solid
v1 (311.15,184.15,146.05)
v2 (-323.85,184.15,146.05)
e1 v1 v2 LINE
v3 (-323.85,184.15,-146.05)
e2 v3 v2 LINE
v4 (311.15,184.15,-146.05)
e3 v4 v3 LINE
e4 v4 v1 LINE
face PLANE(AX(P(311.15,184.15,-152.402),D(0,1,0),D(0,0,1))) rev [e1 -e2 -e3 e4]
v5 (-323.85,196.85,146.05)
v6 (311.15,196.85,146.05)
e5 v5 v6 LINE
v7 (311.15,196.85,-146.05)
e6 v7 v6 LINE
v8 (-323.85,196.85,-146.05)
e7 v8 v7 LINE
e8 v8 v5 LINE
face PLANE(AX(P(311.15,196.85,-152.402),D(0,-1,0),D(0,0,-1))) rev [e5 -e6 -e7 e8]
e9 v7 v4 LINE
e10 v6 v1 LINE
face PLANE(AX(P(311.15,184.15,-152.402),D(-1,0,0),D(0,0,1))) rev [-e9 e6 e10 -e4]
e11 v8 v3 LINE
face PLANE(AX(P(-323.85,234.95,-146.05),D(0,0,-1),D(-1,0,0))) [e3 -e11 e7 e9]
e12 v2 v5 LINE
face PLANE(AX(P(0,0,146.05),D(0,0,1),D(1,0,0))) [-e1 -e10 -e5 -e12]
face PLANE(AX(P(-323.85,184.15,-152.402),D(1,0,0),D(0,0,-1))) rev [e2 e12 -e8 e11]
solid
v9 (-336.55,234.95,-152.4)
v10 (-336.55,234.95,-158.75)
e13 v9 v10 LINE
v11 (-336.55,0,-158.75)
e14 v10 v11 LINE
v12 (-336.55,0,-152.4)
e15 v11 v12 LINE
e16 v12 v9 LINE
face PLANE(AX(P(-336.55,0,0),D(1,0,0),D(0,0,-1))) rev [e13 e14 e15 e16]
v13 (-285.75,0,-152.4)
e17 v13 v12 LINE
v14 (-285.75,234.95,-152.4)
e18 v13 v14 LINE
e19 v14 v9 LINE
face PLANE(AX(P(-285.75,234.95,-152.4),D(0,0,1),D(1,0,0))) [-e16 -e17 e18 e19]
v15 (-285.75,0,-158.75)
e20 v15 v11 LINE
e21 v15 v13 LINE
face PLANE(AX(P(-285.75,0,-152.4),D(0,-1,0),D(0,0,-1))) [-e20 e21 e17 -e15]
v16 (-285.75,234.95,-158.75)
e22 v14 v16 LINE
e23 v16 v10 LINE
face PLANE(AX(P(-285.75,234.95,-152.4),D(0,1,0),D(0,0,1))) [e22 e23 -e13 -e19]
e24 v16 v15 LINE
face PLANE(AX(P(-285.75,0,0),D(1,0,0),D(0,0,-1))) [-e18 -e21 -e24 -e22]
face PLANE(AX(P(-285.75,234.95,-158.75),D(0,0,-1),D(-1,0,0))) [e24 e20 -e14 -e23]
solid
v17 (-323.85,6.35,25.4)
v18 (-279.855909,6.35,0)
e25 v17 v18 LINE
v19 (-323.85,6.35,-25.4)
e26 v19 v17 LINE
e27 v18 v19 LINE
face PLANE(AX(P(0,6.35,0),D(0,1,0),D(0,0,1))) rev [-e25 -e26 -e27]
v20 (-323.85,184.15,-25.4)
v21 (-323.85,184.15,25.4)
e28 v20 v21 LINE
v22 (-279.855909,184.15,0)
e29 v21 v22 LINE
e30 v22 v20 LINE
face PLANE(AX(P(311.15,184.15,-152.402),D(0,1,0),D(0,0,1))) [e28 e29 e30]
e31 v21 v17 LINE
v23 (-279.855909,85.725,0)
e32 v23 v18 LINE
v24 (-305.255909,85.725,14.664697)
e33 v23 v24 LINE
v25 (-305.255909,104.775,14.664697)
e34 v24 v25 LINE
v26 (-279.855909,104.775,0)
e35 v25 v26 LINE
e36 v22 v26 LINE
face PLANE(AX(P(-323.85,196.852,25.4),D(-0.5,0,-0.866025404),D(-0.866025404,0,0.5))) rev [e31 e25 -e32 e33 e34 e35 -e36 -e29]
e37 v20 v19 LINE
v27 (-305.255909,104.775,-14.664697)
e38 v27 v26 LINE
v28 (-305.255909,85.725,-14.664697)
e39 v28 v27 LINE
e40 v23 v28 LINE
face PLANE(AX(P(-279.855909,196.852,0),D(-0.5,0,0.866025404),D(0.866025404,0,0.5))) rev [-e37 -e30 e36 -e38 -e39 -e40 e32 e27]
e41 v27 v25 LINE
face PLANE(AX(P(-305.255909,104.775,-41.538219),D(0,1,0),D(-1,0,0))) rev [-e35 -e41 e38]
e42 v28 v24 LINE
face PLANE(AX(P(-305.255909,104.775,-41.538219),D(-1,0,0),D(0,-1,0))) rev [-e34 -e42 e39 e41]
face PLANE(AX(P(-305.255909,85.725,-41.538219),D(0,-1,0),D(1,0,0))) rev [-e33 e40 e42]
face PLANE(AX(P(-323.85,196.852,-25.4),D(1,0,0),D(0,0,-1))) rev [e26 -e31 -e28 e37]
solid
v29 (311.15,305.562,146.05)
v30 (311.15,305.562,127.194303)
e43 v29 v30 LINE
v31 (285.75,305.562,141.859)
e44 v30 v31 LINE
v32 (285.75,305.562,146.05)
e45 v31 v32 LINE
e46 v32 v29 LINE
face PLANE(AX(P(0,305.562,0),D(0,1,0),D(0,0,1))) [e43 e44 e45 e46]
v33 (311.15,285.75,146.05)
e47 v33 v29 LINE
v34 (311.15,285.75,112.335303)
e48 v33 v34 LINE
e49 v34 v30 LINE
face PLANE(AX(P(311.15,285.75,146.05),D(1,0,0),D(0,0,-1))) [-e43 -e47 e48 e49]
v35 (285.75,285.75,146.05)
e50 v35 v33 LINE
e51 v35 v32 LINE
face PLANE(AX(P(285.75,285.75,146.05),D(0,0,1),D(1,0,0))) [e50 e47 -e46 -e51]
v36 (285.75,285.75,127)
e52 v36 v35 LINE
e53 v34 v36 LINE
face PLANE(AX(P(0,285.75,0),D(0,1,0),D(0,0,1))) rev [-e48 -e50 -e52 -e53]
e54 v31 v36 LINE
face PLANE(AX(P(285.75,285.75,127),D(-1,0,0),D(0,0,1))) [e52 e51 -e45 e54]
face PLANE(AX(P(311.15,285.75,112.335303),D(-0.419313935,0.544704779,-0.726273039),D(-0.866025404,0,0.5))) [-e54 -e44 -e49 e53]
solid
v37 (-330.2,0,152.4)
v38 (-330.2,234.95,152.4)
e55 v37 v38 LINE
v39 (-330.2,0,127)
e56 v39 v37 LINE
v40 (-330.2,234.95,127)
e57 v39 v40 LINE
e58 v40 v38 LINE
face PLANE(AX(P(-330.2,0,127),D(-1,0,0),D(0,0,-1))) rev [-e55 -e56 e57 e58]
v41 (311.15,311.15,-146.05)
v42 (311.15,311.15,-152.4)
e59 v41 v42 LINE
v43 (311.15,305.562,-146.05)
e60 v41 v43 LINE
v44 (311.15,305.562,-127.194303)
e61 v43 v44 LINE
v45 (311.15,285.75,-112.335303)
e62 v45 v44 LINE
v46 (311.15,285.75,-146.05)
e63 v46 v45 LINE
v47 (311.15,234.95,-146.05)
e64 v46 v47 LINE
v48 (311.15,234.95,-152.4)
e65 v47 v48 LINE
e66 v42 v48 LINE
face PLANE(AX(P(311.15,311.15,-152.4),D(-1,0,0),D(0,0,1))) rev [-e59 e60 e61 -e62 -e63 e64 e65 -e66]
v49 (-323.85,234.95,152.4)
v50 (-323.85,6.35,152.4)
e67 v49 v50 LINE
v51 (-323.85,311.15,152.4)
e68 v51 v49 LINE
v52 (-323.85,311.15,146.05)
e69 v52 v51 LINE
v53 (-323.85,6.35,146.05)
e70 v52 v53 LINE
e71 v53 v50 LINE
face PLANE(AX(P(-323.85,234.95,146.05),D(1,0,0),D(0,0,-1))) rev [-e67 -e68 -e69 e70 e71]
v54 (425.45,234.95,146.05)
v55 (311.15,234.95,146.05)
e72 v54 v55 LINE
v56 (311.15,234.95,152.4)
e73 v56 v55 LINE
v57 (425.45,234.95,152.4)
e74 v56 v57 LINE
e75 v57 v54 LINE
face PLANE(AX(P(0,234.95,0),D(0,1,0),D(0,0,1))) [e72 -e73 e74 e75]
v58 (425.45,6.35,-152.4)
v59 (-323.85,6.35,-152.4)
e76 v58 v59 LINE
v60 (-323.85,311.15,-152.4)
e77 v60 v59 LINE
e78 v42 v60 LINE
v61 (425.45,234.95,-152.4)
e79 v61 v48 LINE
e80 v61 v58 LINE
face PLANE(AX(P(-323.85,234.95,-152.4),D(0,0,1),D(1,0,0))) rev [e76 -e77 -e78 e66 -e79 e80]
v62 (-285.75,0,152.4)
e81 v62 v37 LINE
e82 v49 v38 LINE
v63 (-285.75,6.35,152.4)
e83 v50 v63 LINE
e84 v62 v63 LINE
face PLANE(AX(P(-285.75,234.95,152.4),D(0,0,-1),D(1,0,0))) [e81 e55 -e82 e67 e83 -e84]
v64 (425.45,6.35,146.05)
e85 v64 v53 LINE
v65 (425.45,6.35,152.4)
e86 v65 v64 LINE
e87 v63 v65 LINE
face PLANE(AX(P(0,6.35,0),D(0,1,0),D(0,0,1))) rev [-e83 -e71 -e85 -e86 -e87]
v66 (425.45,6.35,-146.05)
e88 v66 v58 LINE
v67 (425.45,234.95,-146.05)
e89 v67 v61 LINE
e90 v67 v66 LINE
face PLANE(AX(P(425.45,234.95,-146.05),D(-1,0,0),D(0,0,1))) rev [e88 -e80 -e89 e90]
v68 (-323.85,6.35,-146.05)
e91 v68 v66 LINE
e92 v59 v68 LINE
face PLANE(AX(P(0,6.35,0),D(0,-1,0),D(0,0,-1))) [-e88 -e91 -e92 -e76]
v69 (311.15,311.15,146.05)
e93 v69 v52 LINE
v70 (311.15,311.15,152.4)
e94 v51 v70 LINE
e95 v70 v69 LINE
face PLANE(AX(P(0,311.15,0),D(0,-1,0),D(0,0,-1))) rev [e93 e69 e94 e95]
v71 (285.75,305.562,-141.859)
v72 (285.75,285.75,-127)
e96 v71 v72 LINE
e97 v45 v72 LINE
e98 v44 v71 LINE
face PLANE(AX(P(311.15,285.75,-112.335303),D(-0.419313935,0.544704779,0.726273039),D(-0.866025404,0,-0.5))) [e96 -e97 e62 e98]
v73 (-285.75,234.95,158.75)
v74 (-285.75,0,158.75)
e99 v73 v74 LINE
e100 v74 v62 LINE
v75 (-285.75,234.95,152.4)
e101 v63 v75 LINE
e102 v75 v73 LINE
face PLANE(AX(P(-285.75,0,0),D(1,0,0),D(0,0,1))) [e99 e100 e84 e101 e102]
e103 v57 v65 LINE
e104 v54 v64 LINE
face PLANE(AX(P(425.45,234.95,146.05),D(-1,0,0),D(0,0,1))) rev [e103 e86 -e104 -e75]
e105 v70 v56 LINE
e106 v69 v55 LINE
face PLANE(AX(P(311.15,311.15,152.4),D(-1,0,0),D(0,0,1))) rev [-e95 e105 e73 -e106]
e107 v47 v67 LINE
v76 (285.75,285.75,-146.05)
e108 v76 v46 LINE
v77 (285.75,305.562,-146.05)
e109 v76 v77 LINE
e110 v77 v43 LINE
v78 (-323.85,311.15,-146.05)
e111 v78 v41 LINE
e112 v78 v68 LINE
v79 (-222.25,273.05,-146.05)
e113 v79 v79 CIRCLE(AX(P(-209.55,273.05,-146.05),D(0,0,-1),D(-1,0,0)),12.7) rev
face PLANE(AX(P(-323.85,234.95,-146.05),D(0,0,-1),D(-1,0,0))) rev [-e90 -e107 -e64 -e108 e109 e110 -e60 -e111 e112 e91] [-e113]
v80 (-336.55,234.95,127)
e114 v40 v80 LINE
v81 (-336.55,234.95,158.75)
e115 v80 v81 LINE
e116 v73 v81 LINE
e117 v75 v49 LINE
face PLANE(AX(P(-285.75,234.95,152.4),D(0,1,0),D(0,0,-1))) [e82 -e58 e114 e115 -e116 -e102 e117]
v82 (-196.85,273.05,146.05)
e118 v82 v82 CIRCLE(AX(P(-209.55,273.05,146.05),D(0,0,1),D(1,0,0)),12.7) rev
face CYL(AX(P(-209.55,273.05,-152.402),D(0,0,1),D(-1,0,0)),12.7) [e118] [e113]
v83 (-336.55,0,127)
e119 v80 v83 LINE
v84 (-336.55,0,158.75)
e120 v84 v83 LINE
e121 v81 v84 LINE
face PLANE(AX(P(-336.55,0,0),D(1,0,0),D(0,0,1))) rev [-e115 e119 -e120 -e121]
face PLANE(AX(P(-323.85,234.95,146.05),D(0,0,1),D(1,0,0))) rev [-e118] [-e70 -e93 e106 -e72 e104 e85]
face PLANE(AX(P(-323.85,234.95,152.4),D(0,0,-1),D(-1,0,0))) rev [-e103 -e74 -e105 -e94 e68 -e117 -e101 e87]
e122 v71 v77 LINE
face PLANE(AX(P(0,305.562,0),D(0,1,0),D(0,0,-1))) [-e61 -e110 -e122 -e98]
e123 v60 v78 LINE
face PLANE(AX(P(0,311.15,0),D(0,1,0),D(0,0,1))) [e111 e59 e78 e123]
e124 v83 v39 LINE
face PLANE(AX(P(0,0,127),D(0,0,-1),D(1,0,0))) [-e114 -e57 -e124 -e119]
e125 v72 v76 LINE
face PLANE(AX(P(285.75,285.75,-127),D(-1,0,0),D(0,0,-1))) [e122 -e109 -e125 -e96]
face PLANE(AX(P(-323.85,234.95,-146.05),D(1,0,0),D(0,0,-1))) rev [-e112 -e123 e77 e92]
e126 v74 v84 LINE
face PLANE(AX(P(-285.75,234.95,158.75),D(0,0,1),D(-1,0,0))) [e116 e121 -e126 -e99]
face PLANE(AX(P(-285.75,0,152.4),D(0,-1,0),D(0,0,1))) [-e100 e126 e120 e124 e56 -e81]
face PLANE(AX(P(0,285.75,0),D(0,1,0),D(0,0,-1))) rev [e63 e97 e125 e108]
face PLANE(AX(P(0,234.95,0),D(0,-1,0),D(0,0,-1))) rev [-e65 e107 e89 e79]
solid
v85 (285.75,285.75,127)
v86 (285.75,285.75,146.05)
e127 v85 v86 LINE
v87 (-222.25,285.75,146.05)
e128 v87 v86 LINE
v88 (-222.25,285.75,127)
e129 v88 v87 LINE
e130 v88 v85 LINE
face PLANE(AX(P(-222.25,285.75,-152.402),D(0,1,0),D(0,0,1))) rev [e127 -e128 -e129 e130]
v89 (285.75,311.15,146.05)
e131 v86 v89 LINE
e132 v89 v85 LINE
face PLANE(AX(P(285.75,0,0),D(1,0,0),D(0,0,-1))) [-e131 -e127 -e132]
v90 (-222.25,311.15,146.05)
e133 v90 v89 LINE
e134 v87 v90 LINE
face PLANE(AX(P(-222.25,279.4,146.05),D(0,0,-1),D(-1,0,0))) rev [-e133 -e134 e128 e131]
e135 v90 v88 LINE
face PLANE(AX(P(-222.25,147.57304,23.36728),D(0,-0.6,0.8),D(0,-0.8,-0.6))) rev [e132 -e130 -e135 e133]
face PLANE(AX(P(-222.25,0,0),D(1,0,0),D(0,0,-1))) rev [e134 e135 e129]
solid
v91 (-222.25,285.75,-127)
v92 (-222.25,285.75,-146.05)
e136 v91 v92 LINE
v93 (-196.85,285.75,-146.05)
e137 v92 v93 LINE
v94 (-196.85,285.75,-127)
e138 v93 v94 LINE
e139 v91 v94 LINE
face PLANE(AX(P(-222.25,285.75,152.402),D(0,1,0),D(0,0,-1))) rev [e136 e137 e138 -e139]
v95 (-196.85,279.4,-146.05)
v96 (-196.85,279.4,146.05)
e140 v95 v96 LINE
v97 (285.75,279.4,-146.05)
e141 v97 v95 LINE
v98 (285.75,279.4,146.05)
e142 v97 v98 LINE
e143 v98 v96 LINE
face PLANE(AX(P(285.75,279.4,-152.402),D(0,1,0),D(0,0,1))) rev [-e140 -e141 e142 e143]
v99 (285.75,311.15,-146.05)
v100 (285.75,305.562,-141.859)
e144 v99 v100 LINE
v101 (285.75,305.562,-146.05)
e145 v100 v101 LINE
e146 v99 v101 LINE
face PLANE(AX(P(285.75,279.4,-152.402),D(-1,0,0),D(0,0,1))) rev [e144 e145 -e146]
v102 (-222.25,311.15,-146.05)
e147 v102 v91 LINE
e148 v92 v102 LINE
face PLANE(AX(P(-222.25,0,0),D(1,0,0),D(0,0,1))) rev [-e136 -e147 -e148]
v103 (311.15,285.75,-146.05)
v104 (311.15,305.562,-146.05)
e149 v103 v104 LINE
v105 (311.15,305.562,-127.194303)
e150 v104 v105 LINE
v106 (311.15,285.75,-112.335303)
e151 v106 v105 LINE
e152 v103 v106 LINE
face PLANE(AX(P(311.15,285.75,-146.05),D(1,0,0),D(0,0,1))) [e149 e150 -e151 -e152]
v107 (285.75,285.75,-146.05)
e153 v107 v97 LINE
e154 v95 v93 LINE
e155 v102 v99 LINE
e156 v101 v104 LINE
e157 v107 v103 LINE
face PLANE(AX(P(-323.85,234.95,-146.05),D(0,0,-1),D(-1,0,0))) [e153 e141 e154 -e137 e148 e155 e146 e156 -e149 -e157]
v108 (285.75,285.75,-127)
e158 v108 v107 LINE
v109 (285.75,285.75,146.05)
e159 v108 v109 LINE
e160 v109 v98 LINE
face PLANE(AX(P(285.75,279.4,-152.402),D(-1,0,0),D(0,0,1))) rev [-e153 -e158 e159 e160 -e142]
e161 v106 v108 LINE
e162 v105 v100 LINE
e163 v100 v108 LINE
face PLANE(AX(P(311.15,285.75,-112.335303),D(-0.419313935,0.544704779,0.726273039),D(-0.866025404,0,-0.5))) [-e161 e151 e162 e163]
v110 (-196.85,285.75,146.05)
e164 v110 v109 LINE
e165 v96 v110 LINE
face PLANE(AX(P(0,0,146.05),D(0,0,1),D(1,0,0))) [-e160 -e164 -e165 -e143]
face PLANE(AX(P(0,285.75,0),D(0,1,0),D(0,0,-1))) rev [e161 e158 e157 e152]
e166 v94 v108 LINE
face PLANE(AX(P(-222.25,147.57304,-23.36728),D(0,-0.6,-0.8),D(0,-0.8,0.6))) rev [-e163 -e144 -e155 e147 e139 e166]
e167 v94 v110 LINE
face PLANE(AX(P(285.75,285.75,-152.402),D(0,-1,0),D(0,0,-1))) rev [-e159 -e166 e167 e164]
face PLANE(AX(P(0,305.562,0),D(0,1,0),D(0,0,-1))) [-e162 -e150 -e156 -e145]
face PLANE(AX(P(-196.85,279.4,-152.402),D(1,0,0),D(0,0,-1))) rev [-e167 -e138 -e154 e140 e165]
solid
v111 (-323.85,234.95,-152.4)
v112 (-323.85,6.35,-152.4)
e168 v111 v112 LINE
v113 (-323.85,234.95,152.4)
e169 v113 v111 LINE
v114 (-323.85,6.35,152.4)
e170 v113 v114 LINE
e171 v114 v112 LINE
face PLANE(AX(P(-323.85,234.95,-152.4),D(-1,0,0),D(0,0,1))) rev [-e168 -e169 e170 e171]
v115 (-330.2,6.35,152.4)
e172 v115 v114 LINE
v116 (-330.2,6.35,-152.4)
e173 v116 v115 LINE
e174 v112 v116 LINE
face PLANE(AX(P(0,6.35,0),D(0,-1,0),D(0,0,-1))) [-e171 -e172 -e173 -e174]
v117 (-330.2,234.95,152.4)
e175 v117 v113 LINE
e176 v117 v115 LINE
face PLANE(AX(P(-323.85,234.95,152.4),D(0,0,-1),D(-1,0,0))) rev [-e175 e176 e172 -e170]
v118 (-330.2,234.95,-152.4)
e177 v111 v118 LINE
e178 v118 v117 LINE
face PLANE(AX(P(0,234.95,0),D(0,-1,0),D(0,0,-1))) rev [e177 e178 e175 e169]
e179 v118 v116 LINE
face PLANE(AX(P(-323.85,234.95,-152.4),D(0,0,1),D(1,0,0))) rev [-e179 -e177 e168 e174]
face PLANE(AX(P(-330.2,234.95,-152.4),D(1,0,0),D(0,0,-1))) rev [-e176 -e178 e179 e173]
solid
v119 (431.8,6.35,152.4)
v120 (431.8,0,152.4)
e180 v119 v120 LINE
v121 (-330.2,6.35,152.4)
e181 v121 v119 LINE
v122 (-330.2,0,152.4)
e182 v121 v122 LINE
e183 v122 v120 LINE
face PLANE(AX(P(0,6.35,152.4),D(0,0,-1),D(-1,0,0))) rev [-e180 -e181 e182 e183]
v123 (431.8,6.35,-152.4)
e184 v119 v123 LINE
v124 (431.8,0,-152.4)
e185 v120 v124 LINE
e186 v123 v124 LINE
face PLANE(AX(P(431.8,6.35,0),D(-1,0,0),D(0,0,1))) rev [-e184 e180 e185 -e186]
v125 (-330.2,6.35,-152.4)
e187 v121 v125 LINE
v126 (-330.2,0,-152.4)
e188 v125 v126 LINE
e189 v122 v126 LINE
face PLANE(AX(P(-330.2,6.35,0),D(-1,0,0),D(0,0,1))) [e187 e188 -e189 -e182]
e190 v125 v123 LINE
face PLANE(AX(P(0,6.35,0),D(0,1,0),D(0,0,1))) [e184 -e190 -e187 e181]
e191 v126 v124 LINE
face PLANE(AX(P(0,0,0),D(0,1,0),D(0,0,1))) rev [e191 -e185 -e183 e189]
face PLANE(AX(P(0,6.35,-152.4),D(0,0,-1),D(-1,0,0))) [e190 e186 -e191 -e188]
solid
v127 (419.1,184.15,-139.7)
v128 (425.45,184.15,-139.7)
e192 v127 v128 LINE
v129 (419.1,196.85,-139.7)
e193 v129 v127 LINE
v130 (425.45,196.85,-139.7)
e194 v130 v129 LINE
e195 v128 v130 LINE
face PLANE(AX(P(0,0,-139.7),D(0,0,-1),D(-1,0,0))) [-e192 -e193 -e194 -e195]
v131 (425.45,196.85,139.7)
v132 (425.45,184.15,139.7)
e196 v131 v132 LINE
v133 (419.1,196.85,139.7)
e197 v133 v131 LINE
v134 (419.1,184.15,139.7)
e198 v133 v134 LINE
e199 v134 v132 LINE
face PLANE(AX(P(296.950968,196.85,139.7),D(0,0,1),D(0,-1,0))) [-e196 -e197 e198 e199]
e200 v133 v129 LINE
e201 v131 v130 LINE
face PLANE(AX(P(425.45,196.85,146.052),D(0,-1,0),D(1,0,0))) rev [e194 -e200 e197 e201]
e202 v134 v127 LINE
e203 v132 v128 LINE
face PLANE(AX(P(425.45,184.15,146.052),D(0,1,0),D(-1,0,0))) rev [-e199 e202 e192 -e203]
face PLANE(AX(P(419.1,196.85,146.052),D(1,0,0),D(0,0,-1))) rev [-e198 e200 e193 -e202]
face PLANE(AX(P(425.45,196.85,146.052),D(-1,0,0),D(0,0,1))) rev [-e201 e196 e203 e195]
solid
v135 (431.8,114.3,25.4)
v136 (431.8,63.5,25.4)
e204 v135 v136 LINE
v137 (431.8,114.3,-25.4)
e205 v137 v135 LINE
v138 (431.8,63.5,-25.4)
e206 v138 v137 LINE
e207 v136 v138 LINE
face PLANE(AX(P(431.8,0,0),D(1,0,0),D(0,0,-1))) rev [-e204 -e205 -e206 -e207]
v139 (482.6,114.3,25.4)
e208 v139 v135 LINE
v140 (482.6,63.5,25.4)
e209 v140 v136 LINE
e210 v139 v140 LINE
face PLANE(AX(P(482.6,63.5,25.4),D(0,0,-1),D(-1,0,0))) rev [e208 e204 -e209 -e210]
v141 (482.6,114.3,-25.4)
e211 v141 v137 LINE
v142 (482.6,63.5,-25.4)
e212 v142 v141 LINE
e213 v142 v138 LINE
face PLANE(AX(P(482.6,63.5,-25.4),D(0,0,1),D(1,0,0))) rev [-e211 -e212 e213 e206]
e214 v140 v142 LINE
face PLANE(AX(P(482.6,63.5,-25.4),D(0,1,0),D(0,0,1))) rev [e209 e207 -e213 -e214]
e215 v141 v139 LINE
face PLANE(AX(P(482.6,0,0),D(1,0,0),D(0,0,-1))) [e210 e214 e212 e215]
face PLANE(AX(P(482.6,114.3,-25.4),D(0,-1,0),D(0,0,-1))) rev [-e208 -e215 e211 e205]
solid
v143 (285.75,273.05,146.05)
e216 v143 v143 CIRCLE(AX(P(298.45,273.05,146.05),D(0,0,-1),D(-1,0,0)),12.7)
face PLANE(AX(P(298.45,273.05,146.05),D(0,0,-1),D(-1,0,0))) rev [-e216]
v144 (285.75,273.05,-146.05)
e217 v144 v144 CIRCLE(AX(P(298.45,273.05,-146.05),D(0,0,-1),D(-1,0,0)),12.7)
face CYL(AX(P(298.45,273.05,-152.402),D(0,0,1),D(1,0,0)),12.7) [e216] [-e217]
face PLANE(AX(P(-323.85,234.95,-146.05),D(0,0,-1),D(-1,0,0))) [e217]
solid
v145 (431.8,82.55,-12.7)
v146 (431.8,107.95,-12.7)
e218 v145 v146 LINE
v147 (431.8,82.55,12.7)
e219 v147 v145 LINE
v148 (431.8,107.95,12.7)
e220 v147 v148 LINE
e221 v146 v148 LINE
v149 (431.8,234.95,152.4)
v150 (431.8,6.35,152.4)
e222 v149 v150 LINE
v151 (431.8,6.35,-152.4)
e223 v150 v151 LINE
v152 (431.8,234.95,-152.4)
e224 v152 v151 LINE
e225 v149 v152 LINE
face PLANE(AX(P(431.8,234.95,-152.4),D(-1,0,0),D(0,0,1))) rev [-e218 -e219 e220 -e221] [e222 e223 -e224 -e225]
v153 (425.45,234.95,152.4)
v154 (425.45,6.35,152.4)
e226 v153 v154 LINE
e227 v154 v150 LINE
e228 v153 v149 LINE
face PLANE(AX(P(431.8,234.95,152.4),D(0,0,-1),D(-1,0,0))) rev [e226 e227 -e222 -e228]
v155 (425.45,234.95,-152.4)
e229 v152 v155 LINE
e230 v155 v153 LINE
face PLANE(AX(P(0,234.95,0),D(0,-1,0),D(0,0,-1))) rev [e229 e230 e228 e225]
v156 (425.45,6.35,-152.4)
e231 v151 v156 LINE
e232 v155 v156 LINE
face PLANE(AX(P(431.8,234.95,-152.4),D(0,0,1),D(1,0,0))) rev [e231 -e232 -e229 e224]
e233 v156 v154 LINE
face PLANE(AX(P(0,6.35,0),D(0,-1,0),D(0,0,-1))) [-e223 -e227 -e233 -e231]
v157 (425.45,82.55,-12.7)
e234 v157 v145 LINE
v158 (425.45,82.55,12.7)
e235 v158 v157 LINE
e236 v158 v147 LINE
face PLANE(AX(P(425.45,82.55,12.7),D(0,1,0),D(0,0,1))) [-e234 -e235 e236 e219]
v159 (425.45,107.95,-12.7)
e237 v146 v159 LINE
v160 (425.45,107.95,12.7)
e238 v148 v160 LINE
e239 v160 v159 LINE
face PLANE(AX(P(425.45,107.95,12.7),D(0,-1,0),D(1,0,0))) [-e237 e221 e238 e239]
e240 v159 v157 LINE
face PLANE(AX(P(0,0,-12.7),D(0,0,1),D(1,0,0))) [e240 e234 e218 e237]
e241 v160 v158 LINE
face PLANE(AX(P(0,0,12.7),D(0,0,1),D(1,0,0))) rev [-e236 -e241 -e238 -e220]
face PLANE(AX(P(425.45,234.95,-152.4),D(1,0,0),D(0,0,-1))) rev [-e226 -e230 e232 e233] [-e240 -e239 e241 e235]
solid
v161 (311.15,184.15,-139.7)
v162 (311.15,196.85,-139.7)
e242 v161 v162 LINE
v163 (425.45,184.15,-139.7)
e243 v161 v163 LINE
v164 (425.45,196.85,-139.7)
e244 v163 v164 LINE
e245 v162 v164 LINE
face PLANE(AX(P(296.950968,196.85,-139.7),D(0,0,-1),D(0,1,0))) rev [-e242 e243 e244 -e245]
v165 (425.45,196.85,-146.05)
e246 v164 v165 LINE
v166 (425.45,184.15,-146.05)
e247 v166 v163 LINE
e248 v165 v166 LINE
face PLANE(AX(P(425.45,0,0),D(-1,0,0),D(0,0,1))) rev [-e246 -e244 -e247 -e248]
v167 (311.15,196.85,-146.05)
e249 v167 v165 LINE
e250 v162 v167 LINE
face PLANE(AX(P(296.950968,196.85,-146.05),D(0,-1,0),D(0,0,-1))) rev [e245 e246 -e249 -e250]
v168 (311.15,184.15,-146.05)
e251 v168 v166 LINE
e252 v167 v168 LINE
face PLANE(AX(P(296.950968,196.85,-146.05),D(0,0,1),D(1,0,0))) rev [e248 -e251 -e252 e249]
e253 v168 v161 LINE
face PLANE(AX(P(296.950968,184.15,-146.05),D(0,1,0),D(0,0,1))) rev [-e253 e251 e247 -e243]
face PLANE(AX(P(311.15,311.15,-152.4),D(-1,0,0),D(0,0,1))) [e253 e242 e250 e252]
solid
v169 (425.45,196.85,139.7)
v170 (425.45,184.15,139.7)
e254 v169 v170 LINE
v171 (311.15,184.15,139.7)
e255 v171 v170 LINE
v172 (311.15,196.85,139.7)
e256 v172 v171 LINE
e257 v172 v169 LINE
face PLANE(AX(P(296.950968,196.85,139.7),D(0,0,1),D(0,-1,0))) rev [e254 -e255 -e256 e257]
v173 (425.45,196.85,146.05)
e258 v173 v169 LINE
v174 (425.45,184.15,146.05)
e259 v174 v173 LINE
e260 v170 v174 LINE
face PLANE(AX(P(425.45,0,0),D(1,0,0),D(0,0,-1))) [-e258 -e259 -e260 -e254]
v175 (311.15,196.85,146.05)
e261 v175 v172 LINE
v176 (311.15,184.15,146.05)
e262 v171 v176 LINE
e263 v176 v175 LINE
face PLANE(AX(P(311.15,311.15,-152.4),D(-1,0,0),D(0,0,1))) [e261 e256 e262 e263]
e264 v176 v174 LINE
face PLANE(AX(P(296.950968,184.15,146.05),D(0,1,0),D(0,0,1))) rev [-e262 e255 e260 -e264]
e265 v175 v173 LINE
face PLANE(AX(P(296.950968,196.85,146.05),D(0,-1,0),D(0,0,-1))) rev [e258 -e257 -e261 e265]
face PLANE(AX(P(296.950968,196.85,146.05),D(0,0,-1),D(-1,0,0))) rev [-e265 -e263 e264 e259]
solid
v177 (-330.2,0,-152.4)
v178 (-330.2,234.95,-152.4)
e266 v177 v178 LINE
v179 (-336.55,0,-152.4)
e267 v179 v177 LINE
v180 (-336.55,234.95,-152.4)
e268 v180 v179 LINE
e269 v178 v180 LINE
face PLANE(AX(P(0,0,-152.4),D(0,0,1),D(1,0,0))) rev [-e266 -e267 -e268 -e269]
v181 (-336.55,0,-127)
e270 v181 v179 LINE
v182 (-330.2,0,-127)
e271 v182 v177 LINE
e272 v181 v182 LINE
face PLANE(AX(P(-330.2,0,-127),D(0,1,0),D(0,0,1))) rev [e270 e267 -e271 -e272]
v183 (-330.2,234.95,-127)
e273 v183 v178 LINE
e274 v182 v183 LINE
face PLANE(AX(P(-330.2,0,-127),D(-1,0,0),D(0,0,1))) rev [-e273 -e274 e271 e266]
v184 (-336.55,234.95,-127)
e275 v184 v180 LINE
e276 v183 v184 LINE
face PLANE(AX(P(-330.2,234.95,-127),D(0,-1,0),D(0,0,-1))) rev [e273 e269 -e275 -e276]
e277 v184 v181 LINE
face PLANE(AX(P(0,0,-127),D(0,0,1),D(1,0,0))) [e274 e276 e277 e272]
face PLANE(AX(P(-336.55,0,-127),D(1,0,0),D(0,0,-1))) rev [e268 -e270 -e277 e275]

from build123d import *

# Parameters (mm, degrees)
SKETCH1_W                             = 660.4
SKETCH1_H                             = 304.8
SKETCH1_W_2                           = 101.6
FOND_DEPTH                            = 6.35
SKETCH2_W                             = 749.3
SKETCH2_H                             = 6.35
COT_S_HAUT_DEPTH                      = 228.6
COT_S_HAUT_2_DEPTH                    = 228.6
SKETCH3_W                             = 6.35
SKETCH3_H                             = 304.8
COT_ES_BAS_DEPTH                      = 228.6
COT_ES_BAS_2_DEPTH                    = 228.6
SKETCH4_W                             = 635
SKETCH4_H                             = 6.35
SUPPORT_CAGE_DEPTH                    = 76.2
SKETCH5_W                             = 6.35
SKETCH5_H                             = 12.7
SUPPORT_TRAPPE_COT_ES_DEPTH           = 114.3
SUPPORT_TRAPPE_COT_ES_2_DEPTH         = 114.3
SUPPORT_TRAPPE_DEVANT_REACH           = 609.114
SKETCH6_W                             = 6.35
SKETCH6_H                             = 12.7
PLANCHER_MILLIEU_REACH                = 612.195
SKETCH7_W                             = 635
SKETCH7_H                             = 12.7
ROULEAU_REACH                         = 612.195
SKETCH8_R                             = 12.7
SKETCH10_W                            = 482.6
SKETCH10_H                            = 6.35
SOUTIEN_TAPIS_DEPTH                   = 292.1
REBORD_START                          = -25.4
REBORD_TAPIS_DEPTH                    = 508
V_POUR_VIS_SANS_FIN_DEPTH             = 177.8
TROU_V_VIS_SANS_FIN_REACH             = 555.617
SKETCH17_W                            = 25.4
SKETCH17_H                            = 19.05
TROU_V_VIS_SANS_FIN_DIRECTION_2_REACH = 555.617
TROU_SORTIE_VIS_SANS_FIN_DEPTH        = 12.7
TROU_SORTIE_VIS_SANS_FIN_DEPTH_BACK   = 12.7
SKETCH18_W                            = 12.7
SKETCH18_H                            = 25.4
REBORD_START_2                        = -44.45
SKETCH19_W                            = 6.35
SKETCH19_H                            = 234.95
REBORD_POUR_SAC_POUBELLE_DEPTH        = 50.8
SKETCH34_W                            = 6.35
SKETCH34_H                            = 234.95
REBORD_POUR_SAC_POUBELLE_2_DEPTH      = 25.4
SKETCH31_W                            = 50.8
SKETCH31_H                            = 50.8
BOITE_MOTEUR_VIS_SANS_DEPTH           = 50.8


with BuildPart() as part:
    # Sketch1 → Fond (new body)
    with BuildSketch(Plane(origin=(0, 0, 0), x_dir=(1, 0, 0), z_dir=(0, 1, 0))):
        Rectangle(SKETCH1_W, SKETCH1_H)
        with Locations((381, 0)):
            Rectangle(SKETCH1_W_2, SKETCH1_H)
    extrude(amount=FOND_DEPTH)


with BuildPart() as body_2:
    # Sketch2 → Cotés Haut (new body)
    with BuildSketch(Plane(origin=(0, 6.35, 0), x_dir=(1, 0, 0), z_dir=(0, 1, 0))):
        with Locations((50.8, 149.225)):
            Rectangle(SKETCH2_W, SKETCH2_H)
    extrude(amount=COT_S_HAUT_DEPTH)



with BuildPart() as body_3:
    # Sketch2 → Cot_s Haut 2 (new body)
    with BuildSketch(Plane(origin=(0, 6.35, 0), x_dir=(1, 0, 0), z_dir=(0, 1, 0))):
        with Locations((50.8, -149.225)):
            Rectangle(SKETCH2_W, SKETCH2_H)
    extrude(amount=COT_S_HAUT_2_DEPTH)


with BuildPart() as body_4:
    # Sketch3 → Cotées Bas (new body)
    with BuildSketch(Plane(origin=(0, 6.35, 0), x_dir=(1, 0, 0), z_dir=(0, 1, 0))):
        with Locations((-327.025, 0)):
            Rectangle(SKETCH3_W, SKETCH3_H)
    extrude(amount=COT_ES_BAS_DEPTH)


with BuildPart() as body_5:
    # Sketch3 → Cot_es Bas 2 (new body)
    with BuildSketch(Plane(origin=(0, 6.35, 0), x_dir=(1, 0, 0), z_dir=(0, 1, 0))):
        with Locations((428.625, 0)):
            Rectangle(SKETCH3_W, SKETCH3_H)
    extrude(amount=COT_ES_BAS_2_DEPTH)

    # Sketch18 → Trou sortie vis sans fin (cut, two sides: drawn at the far end of the back side and taken through both)
    with BuildSketch(Plane.XY.offset(-TROU_SORTIE_VIS_SANS_FIN_DEPTH_BACK)):
        with Locations((431.8, 95.25)):
            Rectangle(SKETCH18_W, SKETCH18_H)
    extrude(amount=TROU_SORTIE_VIS_SANS_FIN_DEPTH + TROU_SORTIE_VIS_SANS_FIN_DEPTH_BACK, mode=Mode.SUBTRACT)


with BuildPart() as body_2_1:
    add(body_2.part)

    add(body_3.part)  # Support Cage merges body 3
    # Sketch4 → Support Cage (add)
    with BuildSketch(Plane(origin=(0, 234.95, 0), x_dir=(1, 0, 0), z_dir=(0, 1, 0))):
        with Locations((-6.35, 149.225)):
            Rectangle(SKETCH4_W, SKETCH4_H)
        with Locations((-6.35, -149.225)):
            Rectangle(SKETCH4_W, SKETCH4_H)
    extrude(amount=SUPPORT_CAGE_DEPTH)


with BuildPart() as body_5_2:
    # Sketch5 → Support Trappe cotées (new body)
    with BuildSketch(Plane.ZY.offset(-425.45)):
        with Locations((-142.875, 190.5)):
            Rectangle(SKETCH5_W, SKETCH5_H)
    extrude(amount=SUPPORT_TRAPPE_COT_ES_DEPTH)


with BuildPart() as body_6:
    # Sketch5 → Support Trappe cot_es 2 (new body)
    with BuildSketch(Plane.ZY.offset(-425.45)):
        with Locations((142.875, 190.5)):
            Rectangle(SKETCH5_W, SKETCH5_H)
    extrude(amount=SUPPORT_TRAPPE_COT_ES_2_DEPTH)


with BuildPart() as body_7:

    # Sketch6 → Support Trappe devant (new, up to next)
    with BuildSketch(Plane.XY.offset(-139.7), mode=Mode.PRIVATE) as support_trappe_devant_sk1:
        with Locations((422.275, 190.5)):
            Rectangle(SKETCH6_W, SKETCH6_H)
    support_trappe_devant_tool1 = extrude(support_trappe_devant_sk1.sketch, amount=SUPPORT_TRAPPE_DEVANT_REACH, mode=Mode.PRIVATE) - body_6.part
    add(support_trappe_devant_tool1.solids().sort_by_distance((422.275, 190.5, -139.7))[0])


with BuildPart() as body_8:

    # Sketch7 → Plancher millieu (new, up to next)
    with BuildSketch(Plane(origin=(0, 0, 146.05), x_dir=(-1, 0, 0), z_dir=(0, 0, -1)), mode=Mode.PRIVATE) as plancher_millieu_sk1:
        with Locations((6.35, 190.5)):
            Rectangle(SKETCH7_W, SKETCH7_H)
    plancher_millieu_tool1 = extrude(plancher_millieu_sk1.sketch, amount=PLANCHER_MILLIEU_REACH, mode=Mode.PRIVATE) - body_2_1.part
    add(plancher_millieu_tool1.solids().sort_by_distance((-6.35, 190.5, 146.05))[0])


with BuildPart() as body_9:

    # Sketch8 → Rouleau (new, up to next)
    with BuildSketch(Plane(origin=(0, 0, 146.05), x_dir=(-1, 0, 0), z_dir=(0, 0, -1)), mode=Mode.PRIVATE) as rouleau_sk1:
        with Locations((-298.45, 273.05)):
            Circle(SKETCH8_R)
    rouleau_tool1 = extrude(rouleau_sk1.sketch, amount=ROULEAU_REACH, mode=Mode.PRIVATE) - body_2_1.part
    rouleau = rouleau_tool1.solids().sort_by_distance((298.45, 273.05, 146.05))[0]
    add(rouleau)


with BuildPart() as body_2_2:
    add(body_2_1.part)

    # Mirror1: Rouleau across plane
    add(rouleau.mirror(Plane(origin=(44.45, 0, 0), x_dir=(0, 0, 1), z_dir=(1, 0, 0))))

    # Mirror9 2: loft between two sections, ruled curve by curve
    mirror9_2_from = [
        Edge.make_line((311.15, 305.562, -127.194303163), (311.15, 305.562, -146.05)),
        Edge.make_line((311.15, 285.75, -146.05), (311.15, 285.75, -112.335303163)),
        Edge.make_line((311.15, 285.75, -112.335303163), (311.15, 305.562, -127.194303163)),
        Edge.make_line((311.15, 285.75, -146.05), (311.15, 305.562, -146.05)),
    ]
    mirror9_2_to = [
        Edge.make_line((285.75, 305.562, -141.859), (285.75, 305.562, -146.05)),
        Edge.make_line((285.75, 285.75, -146.05), (285.75, 285.75, -127)),
        Edge.make_line((285.75, 285.75, -127), (285.75, 305.562, -141.859)),
        Edge.make_line((285.75, 285.75, -146.05), (285.75, 305.562, -146.05)),
    ]
    mirror9_2 = Solid(Shell([*[Face.make_surface_from_curves(mirror9_2_from[k], mirror9_2_to[k]) for k in range(4)], Face(Wire(mirror9_2_from)), Face(Wire(mirror9_2_to))]))
    add(mirror9_2)


with BuildPart() as body_10:
    # Sketch10 → Soutien tapis (new body)
    with BuildSketch(Plane(origin=(0, 0, 146.05), x_dir=(-1, 0, 0), z_dir=(0, 0, -1))):
        with Locations((-44.45, 282.575)):
            Rectangle(SKETCH10_W, SKETCH10_H)
    extrude(amount=SOUTIEN_TAPIS_DEPTH)


with BuildPart() as body_11:
    # Sketch11 → Rebord tapis (new body)
    with BuildSketch(Plane(origin=(311.15, 0, 0), x_dir=(0, 0, -1), z_dir=(1, 0, 0)).offset(REBORD_START)):
        Polygon((-146.05, 311.15), (-127, 285.75), (-146.05, 285.75), align=None)
    rebord_tapis = extrude(amount=-REBORD_TAPIS_DEPTH)


with BuildPart() as body_10_1:
    add(body_10.part)

    # Mirror5: Rebord tapis across plane
    add(rebord_tapis.mirror(Plane.XY))

    # Mirror9: read off the stored shape, not the designer's step
    # Mirror9: loft between two sections, ruled curve by curve
    mirror9_from = [
        Edge.make_line((311.15, 285.75, -146.05), (311.15, 285.75, -112.335303163)),
        Edge.make_line((311.15, 305.562, -127.194303163), (311.15, 305.562, -146.05)),
        Edge.make_line((311.15, 285.75, -112.335303163), (311.15, 305.562, -127.194303163)),
        Edge.make_line((311.15, 305.562, -146.05), (311.15, 285.75, -146.05)),
    ]
    mirror9_to = [
        Edge.make_line((285.75, 285.75, -146.05), (285.75, 285.75, -127)),
        Edge.make_line((285.75, 305.562, -141.859), (285.75, 305.562, -146.05)),
        Edge.make_line((285.75, 285.75, -127), (285.75, 305.562, -141.859)),
        Edge.make_line((285.75, 305.562, -146.05), (285.75, 285.75, -146.05)),
    ]
    mirror9 = Solid(Shell([*[Face.make_surface_from_curves(mirror9_from[k], mirror9_to[k]) for k in range(4)], Face(Wire(mirror9_from)), Face(Wire(mirror9_to))]))
    add(mirror9)


with BuildPart() as body_12:
    # Sketch13 → V pour vis sans fin (new body)
    with BuildSketch(Plane(origin=(0, 6.35, 0), x_dir=(1, 0, 0), z_dir=(0, 1, 0))):
        Polygon((-279.855909488, 0), (-323.85, 25.4), (-323.85, -25.4), align=None)
    extrude(amount=V_POUR_VIS_SANS_FIN_DEPTH)

    # Trou V vis sans fin: up to this face of the body (flat: up to its plane)
    trou_v_vis_sans_fin_end = Plane(body_12.part.faces().sort_by_distance((-301.852954744, 95.25, -12.7))[0])
    # Sketch17 → Trou V vis sans fin (cut, up to the picked face)
    with BuildSketch(Plane.XY, mode=Mode.PRIVATE) as trou_v_vis_sans_fin_sk1:
        with Locations((-292.555909488, 95.25)):
            Rectangle(SKETCH17_W, SKETCH17_H)
    trou_v_vis_sans_fin_tool1 = split(extrude(trou_v_vis_sans_fin_sk1.sketch, amount=-TROU_V_VIS_SANS_FIN_REACH, mode=Mode.PRIVATE), bisect_by=trou_v_vis_sans_fin_end, keep=Keep.BOTH, mode=Mode.PRIVATE)
    add(trou_v_vis_sans_fin_tool1.solids().sort_by(Axis((-292.555909, 95.25, 0), (0, 0, -1)))[0], mode=Mode.SUBTRACT)

    # Trou V vis sans fin direction 2: up to this face of the body (flat: up to its plane)
    trou_v_vis_sans_fin_direction_2_end = Plane(body_12.part.faces().sort_by_distance((-301.852954744, 95.25, 12.7))[0])
    # Sketch17 → Trou V vis sans fin direction 2 (cut, up to the picked face)
    with BuildSketch(Plane.XY, mode=Mode.PRIVATE) as trou_v_vis_sans_fin_direction_2_sk1:
        with Locations((-292.555909488, 95.25)):
            Rectangle(SKETCH17_W, SKETCH17_H)
    trou_v_vis_sans_fin_direction_2_tool1 = split(extrude(trou_v_vis_sans_fin_direction_2_sk1.sketch, amount=TROU_V_VIS_SANS_FIN_DIRECTION_2_REACH, mode=Mode.PRIVATE), bisect_by=trou_v_vis_sans_fin_direction_2_end, keep=Keep.BOTH, mode=Mode.PRIVATE)
    add(trou_v_vis_sans_fin_direction_2_tool1.solids().sort_by(Axis((-292.555909, 95.25, 0), (0, 0, 1)))[0], mode=Mode.SUBTRACT)


with BuildPart() as body_13:
    # Sketch19 → Rebord pour sac poubelle (new body)
    with BuildSketch(Plane.ZY.offset(330.2).offset(REBORD_START_2)):
        with Locations((-155.575, 117.475)):
            Rectangle(SKETCH19_W, SKETCH19_H)
    rebord_pour_sac_poubelle = extrude(amount=REBORD_POUR_SAC_POUBELLE_DEPTH)


with BuildPart() as body_14:
    # Sketch34 → Rebord pour sac poubelle 2 (new body)
    with BuildSketch(Plane.XY.offset(-152.4)):
        with Locations((-333.375, 117.475)):
            Rectangle(SKETCH34_W, SKETCH34_H)
    rebord_pour_sac_poubelle_2 = extrude(amount=REBORD_POUR_SAC_POUBELLE_2_DEPTH)


with BuildPart() as body_15:
    # Rebord tapis 2: read off the stored shape, not the designer's step
    # Rebord tapis 2: loft between two sections, ruled curve by curve
    rebord_tapis_2_from = [
        Edge.make_line((285.75, 285.75, 127), (285.75, 285.75, 146.05)),
        Edge.make_line((285.75, 285.75, 146.05), (311.15, 285.75, 146.05)),
        Edge.make_line((311.15, 285.75, 112.335303163), (285.75, 285.75, 127)),
        Edge.make_line((311.15, 285.75, 146.05), (311.15, 285.75, 112.335303163)),
    ]
    rebord_tapis_2_to = [
        Edge.make_line((285.75, 305.562, 141.859), (285.75, 305.562, 146.05)),
        Edge.make_line((285.75, 305.562, 146.05), (311.15, 305.562, 146.05)),
        Edge.make_line((311.15, 305.562, 127.194303163), (285.75, 305.562, 141.859)),
        Edge.make_line((311.15, 305.562, 146.05), (311.15, 305.562, 127.194303163)),
    ]
    rebord_tapis_2 = Solid(Shell([*[Face.make_surface_from_curves(rebord_tapis_2_from[k], rebord_tapis_2_to[k]) for k in range(4)], Face(Wire(rebord_tapis_2_from)), Face(Wire(rebord_tapis_2_to))]))
    add(rebord_tapis_2)


with BuildPart() as body_16:
    # Sketch31 → Boite moteur vis sans (new body)
    with BuildSketch(Plane(origin=(431.8, 0, 0), x_dir=(0, 0, -1), z_dir=(1, 0, 0))):
        with Locations((0, 88.9)):
            Rectangle(SKETCH31_W, SKETCH31_H)
    extrude(amount=BOITE_MOTEUR_VIS_SANS_DEPTH)


with BuildPart() as body_2_3:
    add(body_2_2.part)

    # Mirror11: Rebord pour sac poubelle across plane
    add(rebord_pour_sac_poubelle.mirror(Plane.XY))

    # Mirror18: Rebord pour sac poubelle 2 across plane
    add(rebord_pour_sac_poubelle_2.mirror(Plane.XY))


solid = Compound([part.part, body_4.part, body_5.part, body_5_2.part, body_6.part, body_7.part, body_8.part, body_9.part, body_11.part, body_10_1.part, body_12.part, body_13.part, body_14.part, body_15.part, body_16.part, body_2_3.part])
